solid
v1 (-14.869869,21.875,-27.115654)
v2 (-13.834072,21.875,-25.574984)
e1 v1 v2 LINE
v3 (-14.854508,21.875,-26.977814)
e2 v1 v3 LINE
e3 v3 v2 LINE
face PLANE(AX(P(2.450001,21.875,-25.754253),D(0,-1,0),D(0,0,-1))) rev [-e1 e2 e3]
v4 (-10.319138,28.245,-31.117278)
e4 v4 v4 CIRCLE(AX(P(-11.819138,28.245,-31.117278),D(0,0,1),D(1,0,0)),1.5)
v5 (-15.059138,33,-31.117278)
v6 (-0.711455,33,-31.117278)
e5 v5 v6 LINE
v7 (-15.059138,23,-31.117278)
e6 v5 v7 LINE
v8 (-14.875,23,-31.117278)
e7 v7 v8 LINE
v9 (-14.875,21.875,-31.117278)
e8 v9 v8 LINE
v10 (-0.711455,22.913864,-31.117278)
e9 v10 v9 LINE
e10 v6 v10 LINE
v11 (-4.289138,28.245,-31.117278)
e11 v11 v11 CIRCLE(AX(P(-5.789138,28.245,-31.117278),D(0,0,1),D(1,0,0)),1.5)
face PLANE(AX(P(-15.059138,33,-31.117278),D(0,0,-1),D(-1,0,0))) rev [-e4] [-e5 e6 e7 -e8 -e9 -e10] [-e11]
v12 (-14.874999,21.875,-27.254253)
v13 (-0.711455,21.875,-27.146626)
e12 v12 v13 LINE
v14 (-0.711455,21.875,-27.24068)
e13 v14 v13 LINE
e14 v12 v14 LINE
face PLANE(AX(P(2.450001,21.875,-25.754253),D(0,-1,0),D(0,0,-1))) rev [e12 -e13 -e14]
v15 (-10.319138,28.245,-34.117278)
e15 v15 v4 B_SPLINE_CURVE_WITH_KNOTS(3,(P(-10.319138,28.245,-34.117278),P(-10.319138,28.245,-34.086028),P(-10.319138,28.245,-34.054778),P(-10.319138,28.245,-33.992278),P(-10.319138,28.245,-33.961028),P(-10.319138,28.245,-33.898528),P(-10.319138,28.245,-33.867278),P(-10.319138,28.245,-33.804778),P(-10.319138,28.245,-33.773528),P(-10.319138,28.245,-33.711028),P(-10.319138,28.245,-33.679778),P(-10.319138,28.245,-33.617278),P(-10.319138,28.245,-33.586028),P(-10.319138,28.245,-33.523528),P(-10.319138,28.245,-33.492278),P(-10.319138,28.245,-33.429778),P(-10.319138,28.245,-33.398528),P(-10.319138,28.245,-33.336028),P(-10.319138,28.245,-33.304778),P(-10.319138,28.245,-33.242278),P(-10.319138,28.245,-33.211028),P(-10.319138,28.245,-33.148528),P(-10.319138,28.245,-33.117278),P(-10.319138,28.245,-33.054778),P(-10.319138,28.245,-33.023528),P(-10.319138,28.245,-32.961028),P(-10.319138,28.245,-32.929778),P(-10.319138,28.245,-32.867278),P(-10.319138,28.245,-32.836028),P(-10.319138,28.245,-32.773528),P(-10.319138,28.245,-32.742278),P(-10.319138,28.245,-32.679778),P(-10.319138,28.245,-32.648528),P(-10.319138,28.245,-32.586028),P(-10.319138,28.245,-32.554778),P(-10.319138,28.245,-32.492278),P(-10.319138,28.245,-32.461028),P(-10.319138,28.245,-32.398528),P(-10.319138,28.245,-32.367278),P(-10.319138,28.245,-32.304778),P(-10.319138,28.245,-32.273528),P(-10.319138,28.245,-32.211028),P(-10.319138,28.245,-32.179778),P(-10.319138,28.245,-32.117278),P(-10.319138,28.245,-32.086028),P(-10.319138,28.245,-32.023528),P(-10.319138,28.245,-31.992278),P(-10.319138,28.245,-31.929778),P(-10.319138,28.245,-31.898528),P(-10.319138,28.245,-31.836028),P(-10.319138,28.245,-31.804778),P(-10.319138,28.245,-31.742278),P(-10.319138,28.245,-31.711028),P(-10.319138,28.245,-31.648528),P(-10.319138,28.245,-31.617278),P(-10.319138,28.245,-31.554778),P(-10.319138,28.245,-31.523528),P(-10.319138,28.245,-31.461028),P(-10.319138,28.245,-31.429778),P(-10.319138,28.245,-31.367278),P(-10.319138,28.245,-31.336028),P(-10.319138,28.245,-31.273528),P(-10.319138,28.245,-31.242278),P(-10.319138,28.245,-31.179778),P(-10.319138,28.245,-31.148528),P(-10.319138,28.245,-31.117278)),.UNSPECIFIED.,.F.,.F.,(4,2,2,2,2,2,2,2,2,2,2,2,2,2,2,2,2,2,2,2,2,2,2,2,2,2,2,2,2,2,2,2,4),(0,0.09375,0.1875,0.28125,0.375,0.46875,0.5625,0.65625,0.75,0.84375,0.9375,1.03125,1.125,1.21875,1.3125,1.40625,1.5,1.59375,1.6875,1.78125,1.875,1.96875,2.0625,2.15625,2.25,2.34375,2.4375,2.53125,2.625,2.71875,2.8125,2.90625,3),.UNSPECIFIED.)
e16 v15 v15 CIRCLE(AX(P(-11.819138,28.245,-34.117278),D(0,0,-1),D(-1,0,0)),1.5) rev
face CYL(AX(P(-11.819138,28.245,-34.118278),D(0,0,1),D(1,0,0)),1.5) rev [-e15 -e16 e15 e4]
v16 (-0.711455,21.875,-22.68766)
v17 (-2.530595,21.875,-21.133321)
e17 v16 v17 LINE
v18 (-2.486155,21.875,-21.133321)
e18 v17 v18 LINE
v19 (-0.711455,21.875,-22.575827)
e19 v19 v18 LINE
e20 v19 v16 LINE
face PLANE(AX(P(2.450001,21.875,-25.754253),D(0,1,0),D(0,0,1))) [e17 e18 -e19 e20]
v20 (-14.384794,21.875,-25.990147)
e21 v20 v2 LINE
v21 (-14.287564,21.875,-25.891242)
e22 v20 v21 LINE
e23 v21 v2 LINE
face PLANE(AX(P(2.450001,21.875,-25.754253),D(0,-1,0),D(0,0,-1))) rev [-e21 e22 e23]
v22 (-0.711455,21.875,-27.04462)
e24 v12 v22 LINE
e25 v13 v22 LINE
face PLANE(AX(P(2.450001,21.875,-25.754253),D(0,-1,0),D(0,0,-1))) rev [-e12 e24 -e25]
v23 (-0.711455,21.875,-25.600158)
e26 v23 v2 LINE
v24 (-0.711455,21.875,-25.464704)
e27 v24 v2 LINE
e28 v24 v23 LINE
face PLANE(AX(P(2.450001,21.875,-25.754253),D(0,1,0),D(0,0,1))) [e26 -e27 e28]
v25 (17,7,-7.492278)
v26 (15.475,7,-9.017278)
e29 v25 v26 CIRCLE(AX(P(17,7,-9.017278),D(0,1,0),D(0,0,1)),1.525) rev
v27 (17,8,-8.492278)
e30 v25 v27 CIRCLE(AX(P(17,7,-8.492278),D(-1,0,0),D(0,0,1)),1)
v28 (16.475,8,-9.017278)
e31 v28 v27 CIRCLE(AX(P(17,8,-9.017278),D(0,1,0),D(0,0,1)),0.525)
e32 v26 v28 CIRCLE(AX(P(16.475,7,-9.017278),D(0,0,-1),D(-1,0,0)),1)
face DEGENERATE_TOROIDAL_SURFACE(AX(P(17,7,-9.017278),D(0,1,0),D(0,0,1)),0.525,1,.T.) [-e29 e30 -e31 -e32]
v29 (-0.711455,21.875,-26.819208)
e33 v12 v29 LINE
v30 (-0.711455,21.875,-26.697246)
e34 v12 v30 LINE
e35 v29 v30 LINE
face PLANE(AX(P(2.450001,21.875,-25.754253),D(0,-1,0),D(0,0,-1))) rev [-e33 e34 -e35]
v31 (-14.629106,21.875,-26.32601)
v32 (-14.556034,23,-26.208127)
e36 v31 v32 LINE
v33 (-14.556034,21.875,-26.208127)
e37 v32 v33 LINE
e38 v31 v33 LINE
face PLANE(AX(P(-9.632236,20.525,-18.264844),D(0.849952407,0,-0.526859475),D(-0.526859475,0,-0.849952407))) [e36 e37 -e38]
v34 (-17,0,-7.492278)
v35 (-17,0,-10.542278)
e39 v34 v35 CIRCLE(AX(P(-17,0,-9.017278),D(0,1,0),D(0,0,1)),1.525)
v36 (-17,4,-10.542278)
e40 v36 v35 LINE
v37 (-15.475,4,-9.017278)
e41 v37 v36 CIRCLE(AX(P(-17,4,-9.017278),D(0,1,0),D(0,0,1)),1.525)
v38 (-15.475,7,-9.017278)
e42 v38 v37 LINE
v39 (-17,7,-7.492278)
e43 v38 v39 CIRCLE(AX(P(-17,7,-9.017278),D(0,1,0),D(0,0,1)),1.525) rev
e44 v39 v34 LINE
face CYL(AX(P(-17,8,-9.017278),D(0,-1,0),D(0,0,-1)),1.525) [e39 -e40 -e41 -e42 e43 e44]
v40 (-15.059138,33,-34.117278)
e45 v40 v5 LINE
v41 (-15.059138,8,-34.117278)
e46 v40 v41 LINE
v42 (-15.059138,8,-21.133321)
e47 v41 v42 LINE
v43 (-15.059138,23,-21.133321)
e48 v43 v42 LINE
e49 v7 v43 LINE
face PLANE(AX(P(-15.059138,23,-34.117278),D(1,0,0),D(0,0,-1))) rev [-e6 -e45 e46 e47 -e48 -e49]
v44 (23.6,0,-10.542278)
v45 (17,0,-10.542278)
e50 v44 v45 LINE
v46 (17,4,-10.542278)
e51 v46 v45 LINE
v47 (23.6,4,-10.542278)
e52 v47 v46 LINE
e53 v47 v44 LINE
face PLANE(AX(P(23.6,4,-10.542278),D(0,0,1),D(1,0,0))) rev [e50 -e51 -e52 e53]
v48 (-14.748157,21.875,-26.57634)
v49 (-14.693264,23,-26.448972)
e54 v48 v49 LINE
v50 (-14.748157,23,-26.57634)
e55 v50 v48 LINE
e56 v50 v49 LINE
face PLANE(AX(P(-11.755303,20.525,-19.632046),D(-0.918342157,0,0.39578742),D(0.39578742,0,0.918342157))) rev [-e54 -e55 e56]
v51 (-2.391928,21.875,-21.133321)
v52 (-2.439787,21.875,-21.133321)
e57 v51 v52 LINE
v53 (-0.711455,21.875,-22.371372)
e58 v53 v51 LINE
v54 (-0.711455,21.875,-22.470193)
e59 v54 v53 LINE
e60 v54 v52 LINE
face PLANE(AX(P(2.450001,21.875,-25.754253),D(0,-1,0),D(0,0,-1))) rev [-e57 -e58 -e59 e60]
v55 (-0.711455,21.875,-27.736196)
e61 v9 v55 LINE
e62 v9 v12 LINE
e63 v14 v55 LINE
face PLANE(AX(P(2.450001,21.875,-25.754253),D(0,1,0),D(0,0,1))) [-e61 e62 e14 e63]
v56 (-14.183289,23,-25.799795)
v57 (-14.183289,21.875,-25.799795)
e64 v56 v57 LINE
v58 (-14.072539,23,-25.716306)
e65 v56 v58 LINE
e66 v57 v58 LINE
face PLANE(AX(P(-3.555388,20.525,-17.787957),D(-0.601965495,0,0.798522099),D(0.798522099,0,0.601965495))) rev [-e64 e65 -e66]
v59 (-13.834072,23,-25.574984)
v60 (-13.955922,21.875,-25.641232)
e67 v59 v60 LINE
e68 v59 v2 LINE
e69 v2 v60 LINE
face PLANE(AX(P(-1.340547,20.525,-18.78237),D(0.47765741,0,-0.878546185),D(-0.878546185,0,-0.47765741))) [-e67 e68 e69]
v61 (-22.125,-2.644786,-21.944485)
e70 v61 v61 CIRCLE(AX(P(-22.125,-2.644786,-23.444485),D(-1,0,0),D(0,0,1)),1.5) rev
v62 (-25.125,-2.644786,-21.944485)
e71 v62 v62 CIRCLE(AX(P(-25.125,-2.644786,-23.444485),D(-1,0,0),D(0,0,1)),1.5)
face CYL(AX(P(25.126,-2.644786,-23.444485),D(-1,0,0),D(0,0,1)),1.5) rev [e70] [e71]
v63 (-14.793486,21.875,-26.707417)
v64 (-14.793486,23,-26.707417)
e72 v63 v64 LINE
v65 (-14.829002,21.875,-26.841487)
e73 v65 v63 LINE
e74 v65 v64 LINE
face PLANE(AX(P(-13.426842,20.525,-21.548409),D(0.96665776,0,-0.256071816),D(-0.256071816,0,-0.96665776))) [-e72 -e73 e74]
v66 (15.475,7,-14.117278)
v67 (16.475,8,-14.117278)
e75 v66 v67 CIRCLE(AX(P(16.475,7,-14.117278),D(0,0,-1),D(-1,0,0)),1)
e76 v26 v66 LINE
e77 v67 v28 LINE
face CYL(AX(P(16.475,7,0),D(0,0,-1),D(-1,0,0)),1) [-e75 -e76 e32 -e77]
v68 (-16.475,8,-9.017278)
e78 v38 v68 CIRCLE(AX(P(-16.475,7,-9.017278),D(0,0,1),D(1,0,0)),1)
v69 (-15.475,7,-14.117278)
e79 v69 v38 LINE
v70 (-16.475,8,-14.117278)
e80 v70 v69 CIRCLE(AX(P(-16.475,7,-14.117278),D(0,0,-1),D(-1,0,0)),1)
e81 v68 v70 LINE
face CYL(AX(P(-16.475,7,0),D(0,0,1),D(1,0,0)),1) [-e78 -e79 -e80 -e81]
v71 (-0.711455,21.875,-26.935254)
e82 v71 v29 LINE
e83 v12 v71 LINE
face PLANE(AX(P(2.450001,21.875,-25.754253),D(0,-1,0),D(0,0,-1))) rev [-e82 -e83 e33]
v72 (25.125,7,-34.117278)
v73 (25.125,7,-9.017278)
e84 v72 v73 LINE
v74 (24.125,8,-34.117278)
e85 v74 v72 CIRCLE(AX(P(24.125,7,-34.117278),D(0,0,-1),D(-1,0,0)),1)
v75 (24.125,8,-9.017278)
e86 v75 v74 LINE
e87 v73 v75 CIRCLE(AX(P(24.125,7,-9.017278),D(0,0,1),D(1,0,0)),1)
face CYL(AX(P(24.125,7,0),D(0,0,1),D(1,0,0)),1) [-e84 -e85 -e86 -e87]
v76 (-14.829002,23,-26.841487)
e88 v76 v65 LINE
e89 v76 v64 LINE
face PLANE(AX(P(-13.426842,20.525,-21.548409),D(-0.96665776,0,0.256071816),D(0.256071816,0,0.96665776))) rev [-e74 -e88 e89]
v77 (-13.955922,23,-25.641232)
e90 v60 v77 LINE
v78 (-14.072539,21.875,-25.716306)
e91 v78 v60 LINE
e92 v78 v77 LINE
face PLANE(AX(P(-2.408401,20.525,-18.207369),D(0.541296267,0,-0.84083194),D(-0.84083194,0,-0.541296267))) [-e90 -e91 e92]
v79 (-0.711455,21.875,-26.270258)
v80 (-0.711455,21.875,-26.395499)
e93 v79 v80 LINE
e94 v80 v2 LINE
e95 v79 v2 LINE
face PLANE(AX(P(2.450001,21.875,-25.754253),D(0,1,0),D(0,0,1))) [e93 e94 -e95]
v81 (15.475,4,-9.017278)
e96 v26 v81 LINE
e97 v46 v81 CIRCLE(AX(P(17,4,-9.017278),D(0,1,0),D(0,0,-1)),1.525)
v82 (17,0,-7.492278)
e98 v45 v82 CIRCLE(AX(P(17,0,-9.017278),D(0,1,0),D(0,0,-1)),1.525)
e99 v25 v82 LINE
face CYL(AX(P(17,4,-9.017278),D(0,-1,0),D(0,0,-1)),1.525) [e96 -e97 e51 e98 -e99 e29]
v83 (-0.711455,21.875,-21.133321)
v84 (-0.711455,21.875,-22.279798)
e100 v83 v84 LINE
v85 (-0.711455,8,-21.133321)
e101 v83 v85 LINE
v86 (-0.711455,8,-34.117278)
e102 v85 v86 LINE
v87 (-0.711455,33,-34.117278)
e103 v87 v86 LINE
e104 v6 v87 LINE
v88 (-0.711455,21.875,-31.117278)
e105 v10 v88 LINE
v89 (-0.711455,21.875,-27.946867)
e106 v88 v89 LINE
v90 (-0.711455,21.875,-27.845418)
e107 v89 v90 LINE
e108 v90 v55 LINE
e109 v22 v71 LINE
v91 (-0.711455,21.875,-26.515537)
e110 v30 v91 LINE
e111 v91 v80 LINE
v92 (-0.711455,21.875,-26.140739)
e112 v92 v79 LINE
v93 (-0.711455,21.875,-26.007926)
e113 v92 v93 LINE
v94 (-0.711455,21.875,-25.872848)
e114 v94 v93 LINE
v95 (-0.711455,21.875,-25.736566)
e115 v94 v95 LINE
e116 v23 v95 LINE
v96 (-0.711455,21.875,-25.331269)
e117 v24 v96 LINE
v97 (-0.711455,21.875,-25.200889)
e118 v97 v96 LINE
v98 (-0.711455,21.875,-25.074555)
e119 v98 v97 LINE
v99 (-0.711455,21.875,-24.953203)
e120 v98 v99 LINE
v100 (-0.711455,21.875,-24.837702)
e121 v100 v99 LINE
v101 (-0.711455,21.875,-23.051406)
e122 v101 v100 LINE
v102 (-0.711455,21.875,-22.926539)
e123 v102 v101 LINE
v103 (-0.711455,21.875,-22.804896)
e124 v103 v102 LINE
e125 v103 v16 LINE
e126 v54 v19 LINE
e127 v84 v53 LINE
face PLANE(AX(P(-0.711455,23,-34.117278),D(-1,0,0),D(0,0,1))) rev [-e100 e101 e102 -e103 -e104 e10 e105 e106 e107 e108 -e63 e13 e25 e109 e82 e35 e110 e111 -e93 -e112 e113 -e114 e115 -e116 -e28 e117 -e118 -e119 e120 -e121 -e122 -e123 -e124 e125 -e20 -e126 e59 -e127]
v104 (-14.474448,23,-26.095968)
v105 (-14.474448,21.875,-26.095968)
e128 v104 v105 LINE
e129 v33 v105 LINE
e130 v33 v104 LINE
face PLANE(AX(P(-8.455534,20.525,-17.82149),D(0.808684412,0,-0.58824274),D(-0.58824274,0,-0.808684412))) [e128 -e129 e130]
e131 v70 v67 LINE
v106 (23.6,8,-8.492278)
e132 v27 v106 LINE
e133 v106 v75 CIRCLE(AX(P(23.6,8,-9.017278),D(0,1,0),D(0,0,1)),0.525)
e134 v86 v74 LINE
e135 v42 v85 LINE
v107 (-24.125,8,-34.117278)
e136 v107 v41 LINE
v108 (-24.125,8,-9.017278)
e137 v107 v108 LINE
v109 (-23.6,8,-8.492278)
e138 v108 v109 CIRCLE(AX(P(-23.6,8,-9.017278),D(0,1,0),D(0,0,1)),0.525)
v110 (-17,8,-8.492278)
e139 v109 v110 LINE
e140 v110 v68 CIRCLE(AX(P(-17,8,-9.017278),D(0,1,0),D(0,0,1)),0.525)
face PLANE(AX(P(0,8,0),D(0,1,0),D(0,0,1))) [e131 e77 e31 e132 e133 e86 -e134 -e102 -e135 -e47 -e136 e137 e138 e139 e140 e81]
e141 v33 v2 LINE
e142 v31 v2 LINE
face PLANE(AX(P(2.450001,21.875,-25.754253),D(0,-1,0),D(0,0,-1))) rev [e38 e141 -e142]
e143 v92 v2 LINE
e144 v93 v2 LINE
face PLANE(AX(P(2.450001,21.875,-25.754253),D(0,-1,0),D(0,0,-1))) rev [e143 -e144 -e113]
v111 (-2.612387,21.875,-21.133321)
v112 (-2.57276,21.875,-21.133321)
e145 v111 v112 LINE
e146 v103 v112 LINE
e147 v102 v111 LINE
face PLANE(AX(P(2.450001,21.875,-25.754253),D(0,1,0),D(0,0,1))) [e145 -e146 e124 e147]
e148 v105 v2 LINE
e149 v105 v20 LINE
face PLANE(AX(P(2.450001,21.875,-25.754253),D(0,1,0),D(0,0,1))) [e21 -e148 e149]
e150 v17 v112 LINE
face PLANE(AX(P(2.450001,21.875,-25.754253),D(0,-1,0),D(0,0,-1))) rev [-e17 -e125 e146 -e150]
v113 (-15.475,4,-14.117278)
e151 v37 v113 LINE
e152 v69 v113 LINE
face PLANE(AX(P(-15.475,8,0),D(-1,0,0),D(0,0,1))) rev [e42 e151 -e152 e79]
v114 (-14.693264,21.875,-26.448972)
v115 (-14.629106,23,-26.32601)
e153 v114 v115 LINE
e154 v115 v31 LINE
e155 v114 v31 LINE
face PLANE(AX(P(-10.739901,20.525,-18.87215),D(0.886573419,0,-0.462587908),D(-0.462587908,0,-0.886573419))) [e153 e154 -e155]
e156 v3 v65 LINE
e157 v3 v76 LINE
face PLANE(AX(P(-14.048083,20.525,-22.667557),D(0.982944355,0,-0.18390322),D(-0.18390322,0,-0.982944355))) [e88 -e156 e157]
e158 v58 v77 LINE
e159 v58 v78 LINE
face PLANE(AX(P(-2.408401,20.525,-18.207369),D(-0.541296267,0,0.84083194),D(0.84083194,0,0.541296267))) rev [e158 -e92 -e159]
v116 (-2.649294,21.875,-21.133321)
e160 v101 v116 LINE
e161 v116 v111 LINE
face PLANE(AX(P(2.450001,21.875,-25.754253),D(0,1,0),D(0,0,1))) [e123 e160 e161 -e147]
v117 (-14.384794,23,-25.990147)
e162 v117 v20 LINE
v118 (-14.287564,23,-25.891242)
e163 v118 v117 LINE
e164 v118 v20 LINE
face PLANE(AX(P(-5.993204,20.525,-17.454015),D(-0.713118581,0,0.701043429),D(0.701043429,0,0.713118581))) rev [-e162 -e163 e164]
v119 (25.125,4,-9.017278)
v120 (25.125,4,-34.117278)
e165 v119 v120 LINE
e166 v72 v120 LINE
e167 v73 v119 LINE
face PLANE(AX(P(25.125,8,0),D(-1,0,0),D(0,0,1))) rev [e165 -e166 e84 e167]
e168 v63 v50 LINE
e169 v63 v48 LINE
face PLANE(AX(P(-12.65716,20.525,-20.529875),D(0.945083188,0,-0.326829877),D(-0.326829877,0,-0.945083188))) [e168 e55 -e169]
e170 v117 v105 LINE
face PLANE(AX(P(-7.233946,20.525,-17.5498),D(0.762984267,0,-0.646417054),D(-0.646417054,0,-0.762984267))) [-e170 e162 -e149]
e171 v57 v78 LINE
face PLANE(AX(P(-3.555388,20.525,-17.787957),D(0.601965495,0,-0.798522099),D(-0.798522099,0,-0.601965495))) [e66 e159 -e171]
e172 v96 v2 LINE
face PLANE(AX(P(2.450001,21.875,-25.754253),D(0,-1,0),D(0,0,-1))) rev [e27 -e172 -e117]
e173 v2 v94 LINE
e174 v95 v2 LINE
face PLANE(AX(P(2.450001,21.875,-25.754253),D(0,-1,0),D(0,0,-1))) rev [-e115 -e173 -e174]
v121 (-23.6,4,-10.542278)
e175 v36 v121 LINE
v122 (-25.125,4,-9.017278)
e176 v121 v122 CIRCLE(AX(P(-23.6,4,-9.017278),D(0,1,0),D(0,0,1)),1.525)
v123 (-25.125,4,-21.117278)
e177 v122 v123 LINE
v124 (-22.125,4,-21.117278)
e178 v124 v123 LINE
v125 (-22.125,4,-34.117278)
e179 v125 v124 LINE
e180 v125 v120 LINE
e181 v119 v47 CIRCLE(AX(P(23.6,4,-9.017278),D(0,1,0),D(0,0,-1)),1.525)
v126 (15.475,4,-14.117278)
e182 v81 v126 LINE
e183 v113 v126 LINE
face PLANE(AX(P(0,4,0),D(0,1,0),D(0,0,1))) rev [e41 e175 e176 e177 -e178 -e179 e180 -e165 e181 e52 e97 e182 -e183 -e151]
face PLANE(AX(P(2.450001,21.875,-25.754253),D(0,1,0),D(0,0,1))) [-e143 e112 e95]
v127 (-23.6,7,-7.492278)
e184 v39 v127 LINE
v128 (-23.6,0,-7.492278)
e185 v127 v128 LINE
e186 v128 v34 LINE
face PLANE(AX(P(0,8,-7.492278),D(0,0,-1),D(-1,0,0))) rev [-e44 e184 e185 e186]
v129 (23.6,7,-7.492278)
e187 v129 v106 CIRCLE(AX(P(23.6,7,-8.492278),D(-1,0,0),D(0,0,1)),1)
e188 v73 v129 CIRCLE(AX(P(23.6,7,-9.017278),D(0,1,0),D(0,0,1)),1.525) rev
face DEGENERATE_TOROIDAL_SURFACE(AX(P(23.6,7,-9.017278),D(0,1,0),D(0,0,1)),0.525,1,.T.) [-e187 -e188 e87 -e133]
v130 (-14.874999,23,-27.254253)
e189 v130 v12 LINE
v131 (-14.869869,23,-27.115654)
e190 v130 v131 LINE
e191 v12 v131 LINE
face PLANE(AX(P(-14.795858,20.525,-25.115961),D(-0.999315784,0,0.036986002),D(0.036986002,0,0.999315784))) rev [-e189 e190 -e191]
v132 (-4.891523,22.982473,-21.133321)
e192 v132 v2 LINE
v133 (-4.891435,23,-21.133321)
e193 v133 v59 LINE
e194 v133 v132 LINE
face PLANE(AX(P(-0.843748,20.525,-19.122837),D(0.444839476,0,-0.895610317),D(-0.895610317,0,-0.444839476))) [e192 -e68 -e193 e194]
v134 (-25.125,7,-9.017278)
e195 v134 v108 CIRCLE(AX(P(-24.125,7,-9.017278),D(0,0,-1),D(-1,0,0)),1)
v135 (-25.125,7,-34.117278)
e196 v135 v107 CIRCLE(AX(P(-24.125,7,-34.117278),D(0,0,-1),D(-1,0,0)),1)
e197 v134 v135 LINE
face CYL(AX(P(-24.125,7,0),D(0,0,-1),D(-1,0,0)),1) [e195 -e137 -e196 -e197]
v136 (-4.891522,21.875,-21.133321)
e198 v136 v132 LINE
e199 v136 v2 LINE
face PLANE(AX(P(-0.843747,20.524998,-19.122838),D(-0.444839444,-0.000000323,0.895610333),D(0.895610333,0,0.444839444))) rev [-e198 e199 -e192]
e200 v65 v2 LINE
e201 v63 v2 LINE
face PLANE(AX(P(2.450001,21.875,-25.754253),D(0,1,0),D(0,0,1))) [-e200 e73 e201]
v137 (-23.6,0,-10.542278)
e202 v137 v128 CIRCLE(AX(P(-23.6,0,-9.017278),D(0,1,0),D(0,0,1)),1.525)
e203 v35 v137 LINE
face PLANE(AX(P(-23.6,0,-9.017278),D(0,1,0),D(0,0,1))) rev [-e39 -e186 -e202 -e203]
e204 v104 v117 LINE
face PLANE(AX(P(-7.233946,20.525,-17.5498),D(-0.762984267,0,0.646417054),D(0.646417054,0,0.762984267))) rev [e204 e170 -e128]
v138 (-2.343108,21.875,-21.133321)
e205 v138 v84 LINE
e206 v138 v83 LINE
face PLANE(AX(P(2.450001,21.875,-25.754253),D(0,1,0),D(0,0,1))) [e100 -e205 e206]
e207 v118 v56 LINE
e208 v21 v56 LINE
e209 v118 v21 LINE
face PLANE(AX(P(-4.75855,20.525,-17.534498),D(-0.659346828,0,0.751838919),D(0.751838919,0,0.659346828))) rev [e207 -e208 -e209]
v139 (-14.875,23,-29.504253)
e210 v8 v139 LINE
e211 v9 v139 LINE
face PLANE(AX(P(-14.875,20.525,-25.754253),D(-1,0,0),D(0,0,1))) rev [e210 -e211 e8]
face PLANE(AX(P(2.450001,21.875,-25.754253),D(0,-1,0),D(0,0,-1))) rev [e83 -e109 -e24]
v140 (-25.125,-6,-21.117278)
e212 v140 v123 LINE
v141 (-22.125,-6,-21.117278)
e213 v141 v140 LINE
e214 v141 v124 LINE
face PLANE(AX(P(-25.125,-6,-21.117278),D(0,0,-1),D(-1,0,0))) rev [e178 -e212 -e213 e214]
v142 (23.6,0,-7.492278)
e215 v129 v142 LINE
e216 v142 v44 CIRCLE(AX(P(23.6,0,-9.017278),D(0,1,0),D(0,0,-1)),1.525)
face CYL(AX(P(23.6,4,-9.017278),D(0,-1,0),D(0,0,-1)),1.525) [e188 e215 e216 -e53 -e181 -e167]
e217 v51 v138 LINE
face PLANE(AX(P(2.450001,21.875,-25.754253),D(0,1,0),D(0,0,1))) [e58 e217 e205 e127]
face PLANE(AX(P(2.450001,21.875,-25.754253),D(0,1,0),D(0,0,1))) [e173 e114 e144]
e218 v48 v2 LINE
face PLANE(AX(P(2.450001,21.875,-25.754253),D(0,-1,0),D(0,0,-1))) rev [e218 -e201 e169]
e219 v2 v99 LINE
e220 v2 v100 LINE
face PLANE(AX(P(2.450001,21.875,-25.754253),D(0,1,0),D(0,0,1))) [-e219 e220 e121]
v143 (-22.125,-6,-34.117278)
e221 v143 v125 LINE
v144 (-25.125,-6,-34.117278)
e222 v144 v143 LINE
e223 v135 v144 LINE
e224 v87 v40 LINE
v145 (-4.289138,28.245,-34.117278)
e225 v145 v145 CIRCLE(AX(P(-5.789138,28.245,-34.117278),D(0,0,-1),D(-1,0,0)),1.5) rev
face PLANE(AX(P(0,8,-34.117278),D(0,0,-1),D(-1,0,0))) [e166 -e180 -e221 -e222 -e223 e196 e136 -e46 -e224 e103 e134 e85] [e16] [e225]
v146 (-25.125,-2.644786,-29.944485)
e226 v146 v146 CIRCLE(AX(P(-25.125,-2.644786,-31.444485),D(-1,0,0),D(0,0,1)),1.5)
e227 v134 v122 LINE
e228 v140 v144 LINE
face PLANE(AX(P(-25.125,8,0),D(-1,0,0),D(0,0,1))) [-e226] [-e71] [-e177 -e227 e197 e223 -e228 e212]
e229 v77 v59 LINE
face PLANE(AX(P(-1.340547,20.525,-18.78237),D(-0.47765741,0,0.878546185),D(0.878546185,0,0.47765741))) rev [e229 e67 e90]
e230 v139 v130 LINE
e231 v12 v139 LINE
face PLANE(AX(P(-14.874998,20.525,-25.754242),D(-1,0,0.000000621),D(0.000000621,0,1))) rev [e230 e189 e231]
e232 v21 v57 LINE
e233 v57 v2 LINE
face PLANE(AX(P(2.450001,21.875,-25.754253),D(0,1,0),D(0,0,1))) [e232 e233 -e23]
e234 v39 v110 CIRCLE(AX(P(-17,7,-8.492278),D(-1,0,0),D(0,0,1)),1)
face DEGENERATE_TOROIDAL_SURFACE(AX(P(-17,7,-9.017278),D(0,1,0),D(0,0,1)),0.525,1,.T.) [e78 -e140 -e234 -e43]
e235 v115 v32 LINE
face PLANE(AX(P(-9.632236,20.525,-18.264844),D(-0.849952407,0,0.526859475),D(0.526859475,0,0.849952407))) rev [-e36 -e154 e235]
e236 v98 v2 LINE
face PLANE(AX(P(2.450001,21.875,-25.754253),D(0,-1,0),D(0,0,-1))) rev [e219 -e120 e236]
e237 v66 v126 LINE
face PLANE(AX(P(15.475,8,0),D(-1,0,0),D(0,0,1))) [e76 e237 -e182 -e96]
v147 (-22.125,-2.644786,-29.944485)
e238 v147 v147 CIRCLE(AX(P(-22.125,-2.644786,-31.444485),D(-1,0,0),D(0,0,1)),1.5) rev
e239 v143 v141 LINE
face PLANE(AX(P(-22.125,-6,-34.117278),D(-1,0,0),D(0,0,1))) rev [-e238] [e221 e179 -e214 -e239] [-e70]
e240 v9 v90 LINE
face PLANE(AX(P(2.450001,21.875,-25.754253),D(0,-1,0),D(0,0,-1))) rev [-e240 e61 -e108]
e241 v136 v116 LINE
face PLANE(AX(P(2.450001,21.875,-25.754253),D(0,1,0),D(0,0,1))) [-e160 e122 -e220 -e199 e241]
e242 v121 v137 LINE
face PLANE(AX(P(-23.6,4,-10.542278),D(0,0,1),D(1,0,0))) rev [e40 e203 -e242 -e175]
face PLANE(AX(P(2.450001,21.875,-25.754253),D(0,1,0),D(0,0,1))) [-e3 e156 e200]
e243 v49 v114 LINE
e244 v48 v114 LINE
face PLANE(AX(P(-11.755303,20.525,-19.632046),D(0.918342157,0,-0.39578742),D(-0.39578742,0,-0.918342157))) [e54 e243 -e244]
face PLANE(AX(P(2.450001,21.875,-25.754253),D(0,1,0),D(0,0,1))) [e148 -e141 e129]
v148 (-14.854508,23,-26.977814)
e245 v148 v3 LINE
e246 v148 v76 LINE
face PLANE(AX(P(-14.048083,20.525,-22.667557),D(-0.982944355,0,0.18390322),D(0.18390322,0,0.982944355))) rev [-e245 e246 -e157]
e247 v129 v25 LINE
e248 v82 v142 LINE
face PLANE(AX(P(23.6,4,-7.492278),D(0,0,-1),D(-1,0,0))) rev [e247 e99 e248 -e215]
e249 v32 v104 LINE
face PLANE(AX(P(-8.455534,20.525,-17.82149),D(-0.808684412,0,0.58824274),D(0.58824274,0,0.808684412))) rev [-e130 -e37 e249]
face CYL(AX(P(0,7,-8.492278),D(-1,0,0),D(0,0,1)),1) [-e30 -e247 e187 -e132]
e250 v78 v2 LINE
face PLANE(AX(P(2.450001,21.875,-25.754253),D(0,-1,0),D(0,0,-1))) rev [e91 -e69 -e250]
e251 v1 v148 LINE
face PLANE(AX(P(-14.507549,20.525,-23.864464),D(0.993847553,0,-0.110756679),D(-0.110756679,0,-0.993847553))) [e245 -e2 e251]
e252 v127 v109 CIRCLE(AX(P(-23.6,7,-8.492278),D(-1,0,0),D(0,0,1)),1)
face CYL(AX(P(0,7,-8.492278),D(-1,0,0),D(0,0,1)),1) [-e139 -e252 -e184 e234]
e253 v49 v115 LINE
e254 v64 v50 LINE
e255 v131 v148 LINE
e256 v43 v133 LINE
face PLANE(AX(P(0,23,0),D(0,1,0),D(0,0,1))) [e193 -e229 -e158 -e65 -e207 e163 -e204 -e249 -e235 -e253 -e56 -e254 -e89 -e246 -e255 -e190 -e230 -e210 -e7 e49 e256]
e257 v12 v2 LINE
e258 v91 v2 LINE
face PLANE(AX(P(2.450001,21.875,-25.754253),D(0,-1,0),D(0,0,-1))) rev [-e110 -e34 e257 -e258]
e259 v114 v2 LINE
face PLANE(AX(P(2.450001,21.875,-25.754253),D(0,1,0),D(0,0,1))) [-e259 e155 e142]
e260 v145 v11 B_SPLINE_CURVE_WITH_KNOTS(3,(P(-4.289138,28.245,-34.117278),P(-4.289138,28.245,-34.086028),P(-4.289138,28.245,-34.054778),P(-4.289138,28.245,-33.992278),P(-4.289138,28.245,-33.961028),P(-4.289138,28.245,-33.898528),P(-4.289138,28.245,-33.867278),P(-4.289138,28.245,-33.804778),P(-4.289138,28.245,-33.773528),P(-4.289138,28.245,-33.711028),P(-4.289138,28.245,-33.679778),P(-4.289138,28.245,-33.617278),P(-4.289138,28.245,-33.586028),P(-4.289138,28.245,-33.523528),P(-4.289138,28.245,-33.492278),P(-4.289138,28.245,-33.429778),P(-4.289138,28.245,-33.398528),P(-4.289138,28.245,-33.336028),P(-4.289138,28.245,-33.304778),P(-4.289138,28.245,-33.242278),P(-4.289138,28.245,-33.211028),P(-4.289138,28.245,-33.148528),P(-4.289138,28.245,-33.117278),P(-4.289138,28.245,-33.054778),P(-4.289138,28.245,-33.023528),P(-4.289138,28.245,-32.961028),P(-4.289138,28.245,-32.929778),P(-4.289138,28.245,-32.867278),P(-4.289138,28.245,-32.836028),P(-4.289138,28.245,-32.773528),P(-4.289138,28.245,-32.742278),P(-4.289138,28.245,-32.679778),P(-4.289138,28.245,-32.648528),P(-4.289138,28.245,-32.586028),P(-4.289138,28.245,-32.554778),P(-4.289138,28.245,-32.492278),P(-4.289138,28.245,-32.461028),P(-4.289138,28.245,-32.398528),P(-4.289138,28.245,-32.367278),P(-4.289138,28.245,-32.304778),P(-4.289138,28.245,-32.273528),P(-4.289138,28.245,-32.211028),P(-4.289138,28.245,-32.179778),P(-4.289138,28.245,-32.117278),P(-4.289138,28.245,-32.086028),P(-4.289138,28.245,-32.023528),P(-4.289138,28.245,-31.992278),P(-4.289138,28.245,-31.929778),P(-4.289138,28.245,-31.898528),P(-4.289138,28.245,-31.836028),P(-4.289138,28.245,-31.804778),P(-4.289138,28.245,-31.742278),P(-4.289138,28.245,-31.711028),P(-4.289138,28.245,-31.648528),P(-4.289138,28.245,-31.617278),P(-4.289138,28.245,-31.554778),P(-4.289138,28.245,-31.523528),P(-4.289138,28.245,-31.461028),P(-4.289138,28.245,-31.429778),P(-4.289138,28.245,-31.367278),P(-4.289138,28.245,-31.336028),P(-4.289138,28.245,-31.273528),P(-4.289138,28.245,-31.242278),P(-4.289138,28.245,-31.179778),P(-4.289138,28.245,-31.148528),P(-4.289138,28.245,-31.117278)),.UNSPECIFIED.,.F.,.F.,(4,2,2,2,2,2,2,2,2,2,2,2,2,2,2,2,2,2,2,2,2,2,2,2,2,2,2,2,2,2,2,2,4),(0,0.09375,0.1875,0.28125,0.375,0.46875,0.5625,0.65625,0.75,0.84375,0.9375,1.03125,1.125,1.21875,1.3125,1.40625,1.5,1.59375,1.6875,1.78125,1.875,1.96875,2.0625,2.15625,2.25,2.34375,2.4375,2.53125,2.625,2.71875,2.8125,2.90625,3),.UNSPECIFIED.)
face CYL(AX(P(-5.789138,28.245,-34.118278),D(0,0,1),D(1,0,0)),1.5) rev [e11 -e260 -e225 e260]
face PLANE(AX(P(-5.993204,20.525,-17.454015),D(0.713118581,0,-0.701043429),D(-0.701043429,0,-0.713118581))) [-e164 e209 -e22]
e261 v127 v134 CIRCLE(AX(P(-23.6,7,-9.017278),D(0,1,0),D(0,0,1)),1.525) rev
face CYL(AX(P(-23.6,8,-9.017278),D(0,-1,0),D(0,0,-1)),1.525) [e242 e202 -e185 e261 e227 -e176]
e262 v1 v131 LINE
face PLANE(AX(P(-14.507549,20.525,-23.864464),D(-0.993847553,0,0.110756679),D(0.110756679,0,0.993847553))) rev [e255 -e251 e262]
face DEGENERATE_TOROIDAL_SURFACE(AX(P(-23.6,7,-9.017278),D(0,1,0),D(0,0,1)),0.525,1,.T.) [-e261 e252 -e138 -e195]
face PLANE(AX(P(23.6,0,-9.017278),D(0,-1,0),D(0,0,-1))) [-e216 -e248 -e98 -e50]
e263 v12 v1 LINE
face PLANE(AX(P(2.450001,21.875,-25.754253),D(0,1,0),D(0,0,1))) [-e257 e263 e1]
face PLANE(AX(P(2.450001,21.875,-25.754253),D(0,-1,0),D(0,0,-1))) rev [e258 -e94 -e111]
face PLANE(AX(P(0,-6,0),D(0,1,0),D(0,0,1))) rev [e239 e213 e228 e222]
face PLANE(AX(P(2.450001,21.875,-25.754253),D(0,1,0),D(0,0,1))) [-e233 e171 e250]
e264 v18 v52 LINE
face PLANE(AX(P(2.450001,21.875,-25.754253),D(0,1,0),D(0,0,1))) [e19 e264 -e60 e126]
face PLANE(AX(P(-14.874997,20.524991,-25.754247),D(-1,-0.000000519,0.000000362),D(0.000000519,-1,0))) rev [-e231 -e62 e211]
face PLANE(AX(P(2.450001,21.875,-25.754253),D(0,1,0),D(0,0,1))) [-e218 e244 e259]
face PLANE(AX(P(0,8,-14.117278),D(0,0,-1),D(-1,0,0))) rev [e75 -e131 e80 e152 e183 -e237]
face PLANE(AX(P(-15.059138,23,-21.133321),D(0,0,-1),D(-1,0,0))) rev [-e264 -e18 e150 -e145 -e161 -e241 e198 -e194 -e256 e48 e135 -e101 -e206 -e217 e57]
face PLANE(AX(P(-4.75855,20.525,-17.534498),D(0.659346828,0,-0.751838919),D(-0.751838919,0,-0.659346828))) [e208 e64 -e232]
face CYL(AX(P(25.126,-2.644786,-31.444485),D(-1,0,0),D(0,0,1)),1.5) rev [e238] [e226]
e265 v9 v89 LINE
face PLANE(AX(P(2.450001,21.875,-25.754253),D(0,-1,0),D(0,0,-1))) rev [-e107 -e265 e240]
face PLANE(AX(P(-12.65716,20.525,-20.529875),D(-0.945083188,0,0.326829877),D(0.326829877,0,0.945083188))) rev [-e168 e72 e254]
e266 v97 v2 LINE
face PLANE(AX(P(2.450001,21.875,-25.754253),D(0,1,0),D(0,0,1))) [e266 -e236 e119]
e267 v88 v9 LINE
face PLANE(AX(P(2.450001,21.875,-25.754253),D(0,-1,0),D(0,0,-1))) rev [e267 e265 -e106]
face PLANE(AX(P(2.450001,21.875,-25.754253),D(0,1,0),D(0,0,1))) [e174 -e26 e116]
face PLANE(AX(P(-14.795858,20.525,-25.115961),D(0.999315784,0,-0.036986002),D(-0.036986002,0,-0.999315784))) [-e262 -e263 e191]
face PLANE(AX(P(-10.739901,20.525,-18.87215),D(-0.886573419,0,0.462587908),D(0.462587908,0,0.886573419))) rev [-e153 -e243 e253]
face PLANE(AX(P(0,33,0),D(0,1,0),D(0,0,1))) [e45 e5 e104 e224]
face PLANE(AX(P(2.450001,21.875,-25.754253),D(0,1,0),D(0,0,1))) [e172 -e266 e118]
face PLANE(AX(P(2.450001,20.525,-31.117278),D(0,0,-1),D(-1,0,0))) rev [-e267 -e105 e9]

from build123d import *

# Parameters (mm, degrees)
BOSS_EXTRUDE1_DEPTH   = 4
BOSS_EXTRUDE1_2_DEPTH = 4
BOSS_EXTRUDE3_DEPTH   = 4
FILLET2_R             = 1
SKETCH4_W             = 14.347682942
SKETCH4_H             = 12.983957321
BOSS_EXTRUDE4_DEPTH   = 15
SKETCH6_W             = 14.347682942
SKETCH6_H             = 3
BOSS_EXTRUDE6_DEPTH   = 10
CUT_EXTRUDE1_REACH    = 49.733
SKETCH7_R             = 1.5
CAVITY2_START         = 21.87499999
CAVITY2_DEPTH         = 1.12500001
SKETCH8_W             = 3
SKETCH8_H             = 13
BOSS_EXTRUDE7_DEPTH   = 10
CUT_EXTRUDE2_REACH    = 71.123
SKETCH10_R            = 1.5


# Read off the part's stored shape, not the designer's step: Cavity2
with BuildPart() as part:
    # Sketch1 → Boss-Extrude1 (new body)
    with BuildSketch(Plane(origin=(0, 0, 0), x_dir=(1, 0, 0), z_dir=(0, 1, 0))):
        with BuildLine():
            Line((-23.6, 10.542278437), (-17, 10.542278437))
            ThreePointArc((-17, 10.542278437), (-15.475, 9.017278437), (-17, 7.492278437))
            Line((-17, 7.492278437), (-23.6, 7.492278437))
            ThreePointArc((-23.6, 7.492278437), (-25.125, 9.017278437), (-23.6, 10.542278437))
        make_face()
    extrude(amount=BOSS_EXTRUDE1_DEPTH)



with BuildPart() as body_2:
    # Sketch1 → Boss-Extrude1 2 (new body)
    with BuildSketch(Plane(origin=(0, 0, 0), x_dir=(1, 0, 0), z_dir=(0, 1, 0))):
        with BuildLine():
            Line((23.6, 7.492278437), (17, 7.492278437))
            ThreePointArc((17, 7.492278437), (15.475, 9.017278437), (17, 10.542278437))
            Line((17, 10.542278437), (23.6, 10.542278437))
            ThreePointArc((23.6, 10.542278437), (25.125, 9.017278437), (23.6, 7.492278437))
        make_face()
    extrude(amount=BOSS_EXTRUDE1_2_DEPTH)


with BuildPart() as part_1:
    add(part.part)

    add(body_2.part)  # Boss-Extrude3 merges body 2
    # Sketch3 → Boss-Extrude3 (add)
    with BuildSketch(Plane(origin=(0, 4, 0), x_dir=(1, 0, 0), z_dir=(0, 1, 0))):
        with BuildLine():
            ThreePointArc((15.475, 9.017278437), (15.921662159, 7.938940596), (17, 7.492278437))
            Line((17, 7.492278437), (23.6, 7.492278437))
            ThreePointArc((23.6, 7.492278437), (24.678337841, 7.938940596), (25.125, 9.017278437))
            Line((25.125, 9.017278437), (25.125, 17.305889592))
            Line((25.125, 17.305889592), (25.125, 34.117278437))
            Line((25.125, 34.117278437), (-25.125, 34.117278437))
            Line((-25.125, 34.117278437), (-25.125, 17.305889592))
            Line((-25.125, 17.305889592), (-25.125, 9.017278437))
            ThreePointArc((-25.125, 9.017278437), (-24.678337841, 10.095616278), (-23.6, 10.542278437))
            Line((-23.6, 10.542278437), (-17, 10.542278437))
            ThreePointArc((-17, 10.542278437), (-15.921662159, 10.095616278), (-15.475, 9.017278437))
            Line((-15.475, 9.017278437), (-15.475, 14.117278437))
            Line((-15.475, 14.117278437), (15.475, 14.117278437))
            Line((15.475, 14.117278437), (15.475, 9.017278437))
        make_face()
        with BuildLine():
            Line((-17, 10.542278437), (-23.6, 10.542278437))
            ThreePointArc((-23.6, 10.542278437), (-25.125, 9.017278437), (-23.6, 7.492278437))
            Line((-23.6, 7.492278437), (-17, 7.492278437))
            ThreePointArc((-17, 7.492278437), (-15.475, 9.017278437), (-17, 10.542278437))
        make_face()
    extrude(amount=BOSS_EXTRUDE3_DEPTH)

    # Fillet2
    fillet2_edges = [part_1.edges().sort_by_distance(p)[0] for p in [
        (-25.125, 8, -21.567278437),
        (15.475, 8, -11.567278437),
        (-24.678337841, 8, -7.938940596),
        (-20.3, 8, -7.492278437),
        (-15.921662159, 8, -7.938940596),
        (-15.475, 8, -11.567278437),
        (15.921662159, 8, -7.938940596),
        (20.3, 8, -7.492278437),
        (24.678337841, 8, -7.938940596),
        (25.125, 8, -21.567278437),
    ]]
    fillet(fillet2_edges, radius=FILLET2_R)

    # Sketch4 → Boss-Extrude4 (add)
    with BuildSketch(Plane(origin=(0, 8, 0), x_dir=(1, 0, 0), z_dir=(0, 1, 0))):
        with Locations((-7.885296824, 27.625299777)):
            Rectangle(SKETCH4_W, SKETCH4_H)
    extrude(amount=BOSS_EXTRUDE4_DEPTH)

    # Sketch6 → Boss-Extrude6 (add)
    with BuildSketch(Plane(origin=(0, 23, 0), x_dir=(1, 0, 0), z_dir=(0, 1, 0))):
        with Locations((-7.885296824, 32.617278437)):
            Rectangle(SKETCH6_W, SKETCH6_H)
    extrude(amount=BOSS_EXTRUDE6_DEPTH)

    # Sketch7 → Cut-Extrude1 (cut, up to next)
    with BuildSketch(Plane.XY.offset(-31.117278437), mode=Mode.PRIVATE) as cut_extrude1_sk1:
        with Locations((-11.819138295, 28.245)):
            Circle(SKETCH7_R)
    cut_extrude1_tool1 = extrude(cut_extrude1_sk1.sketch, amount=-CUT_EXTRUDE1_REACH, mode=Mode.PRIVATE) & part_1.part
    # Sketch7 → Cut-Extrude1 (cut, up to next)
    with BuildSketch(Plane.XY.offset(-31.117278437), mode=Mode.PRIVATE) as cut_extrude1_sk2:
        with Locations((-5.789138295, 28.245)):
            Circle(SKETCH7_R)
    cut_extrude1_tool2 = extrude(cut_extrude1_sk2.sketch, amount=-CUT_EXTRUDE1_REACH, mode=Mode.PRIVATE) & part_1.part
    add(cut_extrude1_tool1.solids().sort_by_distance((-11.819138, 28.245, -31.117278))[0], mode=Mode.SUBTRACT)
    add(cut_extrude1_tool2.solids().sort_by_distance((-5.789138, 28.245, -31.117278))[0], mode=Mode.SUBTRACT)

    # Cavity2 outline → Cavity2 (cut)
    with BuildSketch(Plane(origin=(0, 0, 0), x_dir=(1, 0, 0), z_dir=(0, 1, 0)).offset(CAVITY2_START)):
        Polygon((-0.711455353, 21.133321116), (-0.711455353, 31.117278437), (-14.875000136, 31.117278437), (-14.874999824, 29.504253116), (-14.874998603, 27.254253271), (-14.869868878, 27.115654486), (-14.854507644, 26.977814263), (-14.829001512, 26.841486537), (-14.793485992, 26.707417297), (-14.748156659, 26.57633996), (-14.693263575, 26.448972009), (-14.629105695, 26.326010144), (-14.55603366, 26.208127189), (-14.474448405, 26.095968178), (-14.384794172, 25.99014676), (-14.287564095, 25.89124194), (-14.183289029, 25.799794912), (-14.072538942, 25.716306013), (-13.955921523, 25.641232065), (-13.8340724, 25.574983827), (-4.891452092, 21.133285849), align=None)
    extrude(amount=CAVITY2_DEPTH, mode=Mode.SUBTRACT)

    # Sketch8 → Boss-Extrude7 (add)
    with BuildSketch(Plane.XZ.offset(-4)):
        with Locations((-23.625, -27.617278437)):
            Rectangle(SKETCH8_W, SKETCH8_H)
    extrude(amount=BOSS_EXTRUDE7_DEPTH)

    # Sketch10 → Cut-Extrude2 (cut, up to next)
    with BuildSketch(Plane.ZY.offset(25.125), mode=Mode.PRIVATE) as cut_extrude2_sk1:
        with Locations((-23.44448468, -2.644785648)):
            Circle(SKETCH10_R)
    cut_extrude2_tool1 = extrude(cut_extrude2_sk1.sketch, amount=-CUT_EXTRUDE2_REACH, mode=Mode.PRIVATE) & part_1.part
    # Sketch10 → Cut-Extrude2 (cut, up to next)
    with BuildSketch(Plane.ZY.offset(25.125), mode=Mode.PRIVATE) as cut_extrude2_sk2:
        with Locations((-31.44448468, -2.644785648)):
            Circle(SKETCH10_R)
    cut_extrude2_tool2 = extrude(cut_extrude2_sk2.sketch, amount=-CUT_EXTRUDE2_REACH, mode=Mode.PRIVATE) & part_1.part
    add(cut_extrude2_tool1.solids().sort_by_distance((-25.125, -2.644786, -23.444485))[0], mode=Mode.SUBTRACT)
    add(cut_extrude2_tool2.solids().sort_by_distance((-25.125, -2.644786, -31.444485))[0], mode=Mode.SUBTRACT)


solid = part_1.part
